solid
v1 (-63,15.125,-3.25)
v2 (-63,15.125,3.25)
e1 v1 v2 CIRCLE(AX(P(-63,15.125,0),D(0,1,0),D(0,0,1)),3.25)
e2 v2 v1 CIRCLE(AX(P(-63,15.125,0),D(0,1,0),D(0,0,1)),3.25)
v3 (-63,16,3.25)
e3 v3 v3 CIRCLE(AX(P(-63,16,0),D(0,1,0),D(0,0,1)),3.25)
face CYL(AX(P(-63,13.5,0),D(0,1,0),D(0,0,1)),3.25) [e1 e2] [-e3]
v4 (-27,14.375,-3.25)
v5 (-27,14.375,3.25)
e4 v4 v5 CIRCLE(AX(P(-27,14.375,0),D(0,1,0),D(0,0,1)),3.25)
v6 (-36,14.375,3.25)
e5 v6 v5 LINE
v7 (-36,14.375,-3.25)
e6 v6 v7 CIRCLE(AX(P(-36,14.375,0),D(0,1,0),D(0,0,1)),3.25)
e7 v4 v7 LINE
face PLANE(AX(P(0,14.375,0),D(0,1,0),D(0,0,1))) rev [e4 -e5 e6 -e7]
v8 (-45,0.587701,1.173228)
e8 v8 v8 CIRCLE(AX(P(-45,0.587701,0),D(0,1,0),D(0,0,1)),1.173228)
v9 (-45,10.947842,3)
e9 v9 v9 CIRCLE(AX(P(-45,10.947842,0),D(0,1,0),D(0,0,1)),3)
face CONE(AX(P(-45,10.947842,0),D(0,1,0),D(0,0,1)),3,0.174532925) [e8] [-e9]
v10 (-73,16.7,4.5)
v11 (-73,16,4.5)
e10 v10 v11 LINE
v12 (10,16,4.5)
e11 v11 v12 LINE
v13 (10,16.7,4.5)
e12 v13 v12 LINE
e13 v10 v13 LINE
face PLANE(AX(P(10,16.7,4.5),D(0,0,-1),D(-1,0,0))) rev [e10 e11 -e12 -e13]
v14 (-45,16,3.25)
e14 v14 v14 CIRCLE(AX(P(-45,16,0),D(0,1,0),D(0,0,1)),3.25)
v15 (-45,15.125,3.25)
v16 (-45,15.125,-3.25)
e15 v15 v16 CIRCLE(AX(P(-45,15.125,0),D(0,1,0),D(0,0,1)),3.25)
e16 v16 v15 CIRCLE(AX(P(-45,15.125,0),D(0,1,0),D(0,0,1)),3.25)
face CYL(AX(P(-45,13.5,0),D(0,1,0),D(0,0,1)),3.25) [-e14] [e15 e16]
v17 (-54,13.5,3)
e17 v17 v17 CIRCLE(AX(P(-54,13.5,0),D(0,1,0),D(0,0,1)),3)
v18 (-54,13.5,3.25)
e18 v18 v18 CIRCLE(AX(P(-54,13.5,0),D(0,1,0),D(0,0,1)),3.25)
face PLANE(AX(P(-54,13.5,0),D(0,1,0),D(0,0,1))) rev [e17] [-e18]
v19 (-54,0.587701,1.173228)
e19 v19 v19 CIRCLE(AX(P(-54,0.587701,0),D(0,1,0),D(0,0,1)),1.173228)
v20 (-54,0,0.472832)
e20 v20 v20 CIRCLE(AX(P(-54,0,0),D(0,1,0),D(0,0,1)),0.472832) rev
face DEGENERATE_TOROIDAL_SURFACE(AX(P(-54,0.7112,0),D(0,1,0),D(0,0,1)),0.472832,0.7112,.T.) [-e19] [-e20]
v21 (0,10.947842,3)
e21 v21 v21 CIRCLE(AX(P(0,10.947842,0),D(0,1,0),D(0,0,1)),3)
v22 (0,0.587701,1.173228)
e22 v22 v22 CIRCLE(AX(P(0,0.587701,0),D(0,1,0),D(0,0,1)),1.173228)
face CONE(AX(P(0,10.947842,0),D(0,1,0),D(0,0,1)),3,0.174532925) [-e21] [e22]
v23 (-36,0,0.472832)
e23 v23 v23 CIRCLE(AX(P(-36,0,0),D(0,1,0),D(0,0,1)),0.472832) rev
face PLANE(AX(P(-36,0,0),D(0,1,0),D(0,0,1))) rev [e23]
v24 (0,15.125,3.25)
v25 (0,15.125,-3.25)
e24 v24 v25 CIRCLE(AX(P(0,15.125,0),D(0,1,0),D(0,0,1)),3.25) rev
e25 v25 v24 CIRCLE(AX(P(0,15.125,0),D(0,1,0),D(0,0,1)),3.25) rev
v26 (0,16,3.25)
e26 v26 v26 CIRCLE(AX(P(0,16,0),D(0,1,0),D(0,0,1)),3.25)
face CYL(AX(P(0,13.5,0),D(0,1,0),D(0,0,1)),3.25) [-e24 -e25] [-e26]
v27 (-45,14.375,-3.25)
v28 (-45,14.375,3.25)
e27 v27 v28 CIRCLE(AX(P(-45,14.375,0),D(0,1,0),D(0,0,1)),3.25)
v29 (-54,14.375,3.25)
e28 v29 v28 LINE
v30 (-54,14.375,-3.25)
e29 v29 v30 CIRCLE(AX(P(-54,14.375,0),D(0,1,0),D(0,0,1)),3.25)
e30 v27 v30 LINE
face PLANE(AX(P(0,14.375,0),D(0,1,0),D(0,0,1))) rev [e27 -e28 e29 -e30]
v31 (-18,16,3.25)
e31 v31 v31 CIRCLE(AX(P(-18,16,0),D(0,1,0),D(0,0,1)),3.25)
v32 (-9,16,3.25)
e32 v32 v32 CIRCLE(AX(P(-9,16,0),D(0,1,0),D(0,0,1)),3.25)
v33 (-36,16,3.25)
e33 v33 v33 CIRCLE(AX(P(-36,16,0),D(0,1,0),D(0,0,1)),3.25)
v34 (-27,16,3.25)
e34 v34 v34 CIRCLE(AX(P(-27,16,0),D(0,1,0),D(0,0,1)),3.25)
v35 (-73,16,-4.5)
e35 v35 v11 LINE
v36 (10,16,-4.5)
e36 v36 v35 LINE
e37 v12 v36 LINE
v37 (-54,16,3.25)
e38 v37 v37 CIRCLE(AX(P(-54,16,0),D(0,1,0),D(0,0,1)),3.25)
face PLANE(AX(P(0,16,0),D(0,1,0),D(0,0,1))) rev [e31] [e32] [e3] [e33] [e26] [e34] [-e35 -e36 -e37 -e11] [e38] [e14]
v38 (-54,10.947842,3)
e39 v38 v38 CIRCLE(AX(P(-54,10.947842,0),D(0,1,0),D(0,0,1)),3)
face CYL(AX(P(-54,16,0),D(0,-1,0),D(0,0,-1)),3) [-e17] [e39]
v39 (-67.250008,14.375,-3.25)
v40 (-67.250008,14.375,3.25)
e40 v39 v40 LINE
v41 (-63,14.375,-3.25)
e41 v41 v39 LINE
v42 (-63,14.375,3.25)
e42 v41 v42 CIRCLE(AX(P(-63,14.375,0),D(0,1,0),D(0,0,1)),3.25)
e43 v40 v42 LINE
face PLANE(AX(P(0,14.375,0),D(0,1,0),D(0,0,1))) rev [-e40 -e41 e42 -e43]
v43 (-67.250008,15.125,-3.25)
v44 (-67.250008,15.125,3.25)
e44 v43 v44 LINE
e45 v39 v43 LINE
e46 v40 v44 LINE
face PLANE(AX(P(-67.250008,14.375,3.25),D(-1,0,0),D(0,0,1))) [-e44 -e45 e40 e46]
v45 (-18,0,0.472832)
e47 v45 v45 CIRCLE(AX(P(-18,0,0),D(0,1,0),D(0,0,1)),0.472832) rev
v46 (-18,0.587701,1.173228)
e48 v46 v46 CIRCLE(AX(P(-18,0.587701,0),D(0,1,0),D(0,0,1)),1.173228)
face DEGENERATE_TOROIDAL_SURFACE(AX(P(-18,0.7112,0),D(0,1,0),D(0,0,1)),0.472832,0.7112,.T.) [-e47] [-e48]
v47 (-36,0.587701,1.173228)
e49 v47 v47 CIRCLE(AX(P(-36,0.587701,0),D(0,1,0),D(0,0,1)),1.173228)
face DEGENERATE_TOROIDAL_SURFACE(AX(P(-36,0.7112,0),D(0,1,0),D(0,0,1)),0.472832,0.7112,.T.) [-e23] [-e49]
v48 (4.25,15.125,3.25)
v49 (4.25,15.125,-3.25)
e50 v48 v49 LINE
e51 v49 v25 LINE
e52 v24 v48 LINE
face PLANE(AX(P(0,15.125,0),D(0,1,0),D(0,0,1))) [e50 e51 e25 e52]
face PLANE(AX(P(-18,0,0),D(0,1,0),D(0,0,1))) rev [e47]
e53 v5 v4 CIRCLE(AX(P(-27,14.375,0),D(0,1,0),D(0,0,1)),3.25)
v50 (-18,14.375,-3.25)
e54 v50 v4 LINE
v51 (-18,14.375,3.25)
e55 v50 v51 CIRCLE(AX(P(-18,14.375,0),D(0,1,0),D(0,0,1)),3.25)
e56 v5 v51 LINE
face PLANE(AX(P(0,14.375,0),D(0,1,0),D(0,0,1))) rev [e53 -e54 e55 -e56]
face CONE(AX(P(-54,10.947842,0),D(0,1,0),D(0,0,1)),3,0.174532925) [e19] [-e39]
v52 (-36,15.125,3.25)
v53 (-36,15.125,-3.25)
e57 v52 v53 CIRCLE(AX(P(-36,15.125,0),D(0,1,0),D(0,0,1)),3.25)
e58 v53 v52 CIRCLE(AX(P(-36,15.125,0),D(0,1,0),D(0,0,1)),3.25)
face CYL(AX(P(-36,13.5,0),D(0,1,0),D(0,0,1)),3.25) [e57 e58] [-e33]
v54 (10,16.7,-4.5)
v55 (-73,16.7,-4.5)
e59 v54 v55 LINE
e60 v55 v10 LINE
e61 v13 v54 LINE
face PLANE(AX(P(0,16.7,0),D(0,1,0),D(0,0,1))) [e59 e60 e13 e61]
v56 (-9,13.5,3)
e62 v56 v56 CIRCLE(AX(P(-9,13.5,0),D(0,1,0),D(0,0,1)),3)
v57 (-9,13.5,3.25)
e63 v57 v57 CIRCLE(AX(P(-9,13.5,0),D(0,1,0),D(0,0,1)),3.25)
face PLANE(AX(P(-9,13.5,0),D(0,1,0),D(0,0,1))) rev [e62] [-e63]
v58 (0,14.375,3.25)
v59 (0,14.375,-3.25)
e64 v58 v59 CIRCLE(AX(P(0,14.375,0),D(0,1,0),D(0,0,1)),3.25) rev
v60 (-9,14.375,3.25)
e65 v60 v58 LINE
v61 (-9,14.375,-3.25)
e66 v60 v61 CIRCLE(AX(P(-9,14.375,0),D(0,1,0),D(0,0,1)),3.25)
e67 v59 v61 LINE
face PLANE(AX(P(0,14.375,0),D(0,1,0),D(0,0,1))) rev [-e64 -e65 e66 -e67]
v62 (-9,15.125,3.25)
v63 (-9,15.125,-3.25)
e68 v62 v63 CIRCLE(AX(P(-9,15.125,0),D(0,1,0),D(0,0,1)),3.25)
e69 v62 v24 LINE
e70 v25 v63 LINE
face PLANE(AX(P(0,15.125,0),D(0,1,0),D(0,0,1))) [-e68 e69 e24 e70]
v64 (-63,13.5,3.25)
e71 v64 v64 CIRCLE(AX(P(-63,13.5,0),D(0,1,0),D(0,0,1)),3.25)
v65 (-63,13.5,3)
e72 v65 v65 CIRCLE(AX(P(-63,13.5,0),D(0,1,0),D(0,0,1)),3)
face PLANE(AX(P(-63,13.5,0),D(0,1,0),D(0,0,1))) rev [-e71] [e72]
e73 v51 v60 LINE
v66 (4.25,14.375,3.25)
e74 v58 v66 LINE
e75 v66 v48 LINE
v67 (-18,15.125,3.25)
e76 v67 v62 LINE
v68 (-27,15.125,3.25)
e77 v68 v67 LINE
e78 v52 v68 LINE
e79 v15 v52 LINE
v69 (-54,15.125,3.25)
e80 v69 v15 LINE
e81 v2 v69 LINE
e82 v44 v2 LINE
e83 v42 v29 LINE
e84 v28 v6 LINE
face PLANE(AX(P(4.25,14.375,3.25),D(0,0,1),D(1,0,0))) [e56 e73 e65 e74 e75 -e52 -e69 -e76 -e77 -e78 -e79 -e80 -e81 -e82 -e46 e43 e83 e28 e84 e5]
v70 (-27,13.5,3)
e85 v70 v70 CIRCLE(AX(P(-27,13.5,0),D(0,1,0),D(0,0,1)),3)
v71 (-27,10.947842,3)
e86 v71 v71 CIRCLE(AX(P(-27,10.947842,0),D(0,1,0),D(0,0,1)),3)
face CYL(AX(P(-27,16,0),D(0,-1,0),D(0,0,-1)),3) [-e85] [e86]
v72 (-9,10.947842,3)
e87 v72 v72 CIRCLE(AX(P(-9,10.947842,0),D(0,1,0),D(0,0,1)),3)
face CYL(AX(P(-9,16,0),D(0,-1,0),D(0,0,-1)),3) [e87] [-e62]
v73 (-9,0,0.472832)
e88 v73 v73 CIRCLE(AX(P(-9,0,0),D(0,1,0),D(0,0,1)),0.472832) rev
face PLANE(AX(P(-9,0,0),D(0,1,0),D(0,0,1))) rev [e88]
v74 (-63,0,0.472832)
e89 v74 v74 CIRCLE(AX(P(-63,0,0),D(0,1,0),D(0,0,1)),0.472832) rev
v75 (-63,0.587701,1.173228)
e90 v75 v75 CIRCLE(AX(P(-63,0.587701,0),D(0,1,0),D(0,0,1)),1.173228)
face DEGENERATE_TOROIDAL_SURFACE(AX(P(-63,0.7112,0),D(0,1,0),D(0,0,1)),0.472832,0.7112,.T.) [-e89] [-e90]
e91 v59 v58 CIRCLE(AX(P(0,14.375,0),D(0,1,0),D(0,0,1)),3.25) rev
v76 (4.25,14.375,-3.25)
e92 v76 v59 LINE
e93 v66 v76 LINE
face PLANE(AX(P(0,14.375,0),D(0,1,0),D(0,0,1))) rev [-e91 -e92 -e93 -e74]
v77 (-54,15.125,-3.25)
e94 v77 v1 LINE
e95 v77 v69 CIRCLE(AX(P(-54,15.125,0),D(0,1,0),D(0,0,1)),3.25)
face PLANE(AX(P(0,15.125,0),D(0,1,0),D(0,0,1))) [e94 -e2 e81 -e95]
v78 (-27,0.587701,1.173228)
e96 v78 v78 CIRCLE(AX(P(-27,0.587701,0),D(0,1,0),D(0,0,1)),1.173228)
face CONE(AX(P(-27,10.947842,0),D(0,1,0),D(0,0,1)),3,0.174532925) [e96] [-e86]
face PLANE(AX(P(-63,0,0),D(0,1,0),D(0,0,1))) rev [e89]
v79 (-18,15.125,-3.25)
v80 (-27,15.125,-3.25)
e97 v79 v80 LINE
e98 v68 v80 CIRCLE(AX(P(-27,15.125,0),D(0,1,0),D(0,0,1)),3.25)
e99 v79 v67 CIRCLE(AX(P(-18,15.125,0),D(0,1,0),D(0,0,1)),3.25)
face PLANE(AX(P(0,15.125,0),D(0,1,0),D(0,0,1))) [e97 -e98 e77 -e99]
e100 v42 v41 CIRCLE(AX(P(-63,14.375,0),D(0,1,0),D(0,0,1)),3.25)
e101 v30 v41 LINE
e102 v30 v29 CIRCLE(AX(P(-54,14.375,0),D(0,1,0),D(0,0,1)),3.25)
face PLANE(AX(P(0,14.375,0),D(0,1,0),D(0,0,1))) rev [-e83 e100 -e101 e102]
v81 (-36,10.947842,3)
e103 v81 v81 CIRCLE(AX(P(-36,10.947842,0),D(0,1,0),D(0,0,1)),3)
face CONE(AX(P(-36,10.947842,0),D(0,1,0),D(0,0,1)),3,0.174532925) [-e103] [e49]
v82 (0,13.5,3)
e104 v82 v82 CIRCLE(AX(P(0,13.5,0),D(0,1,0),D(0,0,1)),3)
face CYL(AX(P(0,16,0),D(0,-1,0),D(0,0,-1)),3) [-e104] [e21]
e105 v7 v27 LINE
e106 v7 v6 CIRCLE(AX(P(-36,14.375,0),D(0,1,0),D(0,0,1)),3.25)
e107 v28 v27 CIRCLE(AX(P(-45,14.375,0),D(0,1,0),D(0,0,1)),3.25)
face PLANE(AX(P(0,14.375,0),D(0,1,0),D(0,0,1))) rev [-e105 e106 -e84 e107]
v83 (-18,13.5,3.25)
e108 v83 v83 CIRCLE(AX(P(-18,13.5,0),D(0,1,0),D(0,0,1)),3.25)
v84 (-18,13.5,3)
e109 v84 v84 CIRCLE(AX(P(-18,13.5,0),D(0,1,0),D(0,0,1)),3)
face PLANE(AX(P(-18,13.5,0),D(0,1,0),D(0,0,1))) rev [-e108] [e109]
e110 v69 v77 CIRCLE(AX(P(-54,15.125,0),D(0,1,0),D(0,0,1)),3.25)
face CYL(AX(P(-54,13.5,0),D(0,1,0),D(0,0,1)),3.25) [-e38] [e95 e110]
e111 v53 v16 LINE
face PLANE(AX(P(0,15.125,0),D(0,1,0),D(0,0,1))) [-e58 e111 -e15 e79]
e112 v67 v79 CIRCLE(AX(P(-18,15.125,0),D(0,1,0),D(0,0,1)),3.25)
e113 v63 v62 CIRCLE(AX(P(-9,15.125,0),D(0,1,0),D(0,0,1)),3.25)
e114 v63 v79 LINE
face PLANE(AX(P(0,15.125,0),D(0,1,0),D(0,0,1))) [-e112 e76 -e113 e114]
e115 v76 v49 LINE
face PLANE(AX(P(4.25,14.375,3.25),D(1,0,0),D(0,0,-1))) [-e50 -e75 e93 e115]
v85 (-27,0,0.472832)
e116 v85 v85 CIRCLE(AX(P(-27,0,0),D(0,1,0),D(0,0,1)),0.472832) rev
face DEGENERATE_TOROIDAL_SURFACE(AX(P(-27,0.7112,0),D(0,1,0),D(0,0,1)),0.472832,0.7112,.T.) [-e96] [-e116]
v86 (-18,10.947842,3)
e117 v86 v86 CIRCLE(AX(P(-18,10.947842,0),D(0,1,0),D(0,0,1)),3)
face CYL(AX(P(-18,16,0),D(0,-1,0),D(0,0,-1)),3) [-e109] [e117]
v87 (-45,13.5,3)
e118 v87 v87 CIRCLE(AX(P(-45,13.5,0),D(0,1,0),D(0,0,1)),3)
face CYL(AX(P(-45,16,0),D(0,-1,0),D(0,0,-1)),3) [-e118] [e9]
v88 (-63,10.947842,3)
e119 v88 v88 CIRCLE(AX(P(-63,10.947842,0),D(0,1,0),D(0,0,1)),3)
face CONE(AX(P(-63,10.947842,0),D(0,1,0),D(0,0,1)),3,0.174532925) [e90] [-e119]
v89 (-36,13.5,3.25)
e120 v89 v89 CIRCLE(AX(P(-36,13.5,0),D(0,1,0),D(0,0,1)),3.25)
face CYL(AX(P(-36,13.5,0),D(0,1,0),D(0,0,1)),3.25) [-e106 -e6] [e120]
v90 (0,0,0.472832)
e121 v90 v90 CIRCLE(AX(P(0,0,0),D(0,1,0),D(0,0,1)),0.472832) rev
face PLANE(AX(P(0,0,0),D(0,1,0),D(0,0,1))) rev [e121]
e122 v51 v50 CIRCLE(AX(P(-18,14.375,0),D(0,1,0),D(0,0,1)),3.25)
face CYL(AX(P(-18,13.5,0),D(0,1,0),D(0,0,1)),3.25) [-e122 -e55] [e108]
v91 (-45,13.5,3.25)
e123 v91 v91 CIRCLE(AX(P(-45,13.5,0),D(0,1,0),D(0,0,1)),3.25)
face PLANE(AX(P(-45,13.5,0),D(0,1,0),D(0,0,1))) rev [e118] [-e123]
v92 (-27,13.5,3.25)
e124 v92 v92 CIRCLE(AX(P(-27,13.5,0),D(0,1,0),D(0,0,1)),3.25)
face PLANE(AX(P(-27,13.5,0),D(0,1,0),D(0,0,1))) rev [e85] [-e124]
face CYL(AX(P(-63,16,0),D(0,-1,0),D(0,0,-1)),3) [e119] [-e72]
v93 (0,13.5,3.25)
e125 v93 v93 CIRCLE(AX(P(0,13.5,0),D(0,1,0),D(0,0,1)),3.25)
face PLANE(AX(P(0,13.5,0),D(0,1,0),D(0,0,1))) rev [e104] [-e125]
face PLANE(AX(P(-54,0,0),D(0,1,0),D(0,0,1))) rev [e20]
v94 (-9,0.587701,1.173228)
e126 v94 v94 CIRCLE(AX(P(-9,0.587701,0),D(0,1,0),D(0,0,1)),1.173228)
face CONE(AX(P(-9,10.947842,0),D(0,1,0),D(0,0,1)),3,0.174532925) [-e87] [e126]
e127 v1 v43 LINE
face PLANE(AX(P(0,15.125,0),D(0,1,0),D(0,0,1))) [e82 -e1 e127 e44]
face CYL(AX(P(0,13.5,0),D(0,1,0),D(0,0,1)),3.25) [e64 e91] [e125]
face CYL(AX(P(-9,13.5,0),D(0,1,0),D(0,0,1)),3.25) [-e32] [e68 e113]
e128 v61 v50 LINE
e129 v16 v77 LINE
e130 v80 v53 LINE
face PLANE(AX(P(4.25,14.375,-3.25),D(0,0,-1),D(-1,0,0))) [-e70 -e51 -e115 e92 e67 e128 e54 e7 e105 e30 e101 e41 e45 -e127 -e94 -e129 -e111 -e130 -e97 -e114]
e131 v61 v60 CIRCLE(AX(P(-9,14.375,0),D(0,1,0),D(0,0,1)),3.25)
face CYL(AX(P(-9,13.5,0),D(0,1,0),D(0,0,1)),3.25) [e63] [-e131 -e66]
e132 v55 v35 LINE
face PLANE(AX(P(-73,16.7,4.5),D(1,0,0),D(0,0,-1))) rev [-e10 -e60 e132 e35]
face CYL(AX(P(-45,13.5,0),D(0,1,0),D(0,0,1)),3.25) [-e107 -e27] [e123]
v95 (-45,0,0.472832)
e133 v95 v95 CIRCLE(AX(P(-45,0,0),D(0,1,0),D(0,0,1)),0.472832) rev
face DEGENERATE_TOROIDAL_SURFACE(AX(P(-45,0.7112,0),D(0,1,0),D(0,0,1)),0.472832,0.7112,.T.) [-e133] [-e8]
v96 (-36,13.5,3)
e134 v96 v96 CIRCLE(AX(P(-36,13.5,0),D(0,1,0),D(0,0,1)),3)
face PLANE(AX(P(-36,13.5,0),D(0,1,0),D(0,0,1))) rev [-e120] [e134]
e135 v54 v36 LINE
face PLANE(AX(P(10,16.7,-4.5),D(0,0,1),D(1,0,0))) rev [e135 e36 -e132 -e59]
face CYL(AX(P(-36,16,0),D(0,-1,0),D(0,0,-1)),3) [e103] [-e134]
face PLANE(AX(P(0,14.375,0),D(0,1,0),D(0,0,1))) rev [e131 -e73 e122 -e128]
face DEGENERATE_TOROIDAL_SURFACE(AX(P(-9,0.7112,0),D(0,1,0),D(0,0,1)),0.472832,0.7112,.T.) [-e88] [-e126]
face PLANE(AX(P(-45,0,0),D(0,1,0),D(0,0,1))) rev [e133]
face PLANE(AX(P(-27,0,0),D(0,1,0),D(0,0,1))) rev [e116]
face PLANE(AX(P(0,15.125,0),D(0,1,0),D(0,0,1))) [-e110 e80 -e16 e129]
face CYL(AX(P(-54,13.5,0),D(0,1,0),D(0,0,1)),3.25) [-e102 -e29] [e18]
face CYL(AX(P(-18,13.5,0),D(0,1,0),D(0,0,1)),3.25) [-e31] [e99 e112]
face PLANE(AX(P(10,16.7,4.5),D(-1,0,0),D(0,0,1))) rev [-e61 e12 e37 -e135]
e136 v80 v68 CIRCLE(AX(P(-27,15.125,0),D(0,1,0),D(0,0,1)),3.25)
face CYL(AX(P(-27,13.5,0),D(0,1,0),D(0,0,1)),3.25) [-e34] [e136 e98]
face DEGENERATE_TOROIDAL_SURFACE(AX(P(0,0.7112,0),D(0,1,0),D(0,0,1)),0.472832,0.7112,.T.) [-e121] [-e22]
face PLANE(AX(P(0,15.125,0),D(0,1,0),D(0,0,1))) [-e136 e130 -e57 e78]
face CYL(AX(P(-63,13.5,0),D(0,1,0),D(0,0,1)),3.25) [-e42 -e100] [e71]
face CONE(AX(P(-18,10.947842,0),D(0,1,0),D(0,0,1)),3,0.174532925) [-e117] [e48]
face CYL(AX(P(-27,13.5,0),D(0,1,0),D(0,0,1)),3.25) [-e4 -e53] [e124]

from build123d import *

# Parameters (mm, degrees)
SKETCH2_R           = 3
BOSS_EXTRUDE1_DEPTH = 16
CHAMFER1_SIZE       = 1.9304
CHAMFER1_SIZE2      = 10.947842425
FILLET2_R           = 0.7112
SKETCH3_R           = 3.25
BOSS_EXTRUDE2_DEPTH = 2.5
SKETCH4_W           = 71.5000084
SKETCH4_H           = 6.5
BOSS_EXTRUDE3_DEPTH = 0.75
LPATTERN1_START     = 15.124999972
LPATTERN1_OUTLINE_R = 3.25
LPATTERN1_DEPTH     = 0.875000028
SKETCH5_W           = 83
SKETCH5_H           = 9
BOSS_EXTRUDE4_DEPTH = 0.7


# Read off the part's stored shape, not the designer's step: LPattern1
with BuildPart() as part:
    # Sketch2 → Boss-Extrude1 (new body)
    with BuildSketch(Plane(origin=(0, 0, 0), x_dir=(1, 0, 0), z_dir=(0, 1, 0))):
        with Locations(Location((0, 0, 0), (0, 0, 270))):
            Circle(SKETCH2_R)
    extrude(amount=BOSS_EXTRUDE1_DEPTH)

    # Chamfer1
    chamfer1_edges = [part.edges().sort_by_distance(p)[0] for p in [
        (0, 0, -3),
    ]]
    chamfer1_side = [part.faces().sort_by_distance(p)[0] for p in [
        (0, 0, 0),
    ]]
    chamfer(chamfer1_edges, length=CHAMFER1_SIZE, length2=CHAMFER1_SIZE2, reference=chamfer1_side[0])

    # Fillet2
    fillet2_edges = [part.edges().sort_by_distance(p)[0] for p in [
        (0, 0, -1.0696),
    ]]
    fillet(fillet2_edges, radius=FILLET2_R)

    # Sketch3 → Boss-Extrude2 (add)
    with BuildSketch(Plane(origin=(0, 16, 0), x_dir=(1, 0, 0), z_dir=(0, 1, 0))):
        with Locations(Location((0, 0, 0), (0, 0, 270))):
            Circle(SKETCH3_R)
    extrude(amount=-BOSS_EXTRUDE2_DEPTH)

    # Sketch4 → Boss-Extrude3 (add)
    with BuildSketch(Plane(origin=(0, 15.124999972, 0), x_dir=(1, 0, 0), z_dir=(0, 1, 0))):
        with Locations((-31.5000042, 0)):
            Rectangle(SKETCH4_W, SKETCH4_H)
    extrude(amount=-BOSS_EXTRUDE3_DEPTH)

    # LPattern1 outline → LPattern1 (add)
    with BuildSketch(Plane(origin=(0, 0, 0), x_dir=(1, 0, 0), z_dir=(0, 1, 0)).offset(LPATTERN1_START)):
        with Locations((-9, 0)):
            Circle(LPATTERN1_OUTLINE_R)
        with Locations((-18, 0)):
            Circle(LPATTERN1_OUTLINE_R)
        with Locations((-27, 0)):
            Circle(LPATTERN1_OUTLINE_R)
        with Locations((-36, 0)):
            Circle(LPATTERN1_OUTLINE_R)
        with Locations((-45, 0)):
            Circle(LPATTERN1_OUTLINE_R)
        with Locations((-54, 0)):
            Circle(LPATTERN1_OUTLINE_R)
        with Locations((-63, 0)):
            Circle(LPATTERN1_OUTLINE_R)
    extrude(amount=LPATTERN1_DEPTH)

    # LPattern1 2 outline → LPattern1 2 (revolve)
    with BuildSketch(Plane(origin=(-9, 0, 0), x_dir=(1, 0, 0), z_dir=(0, 0, 1))):
        with BuildLine():
            Line((0, 14.374999972), (0, 0))
            Line((0, 0), (0.472832342, 0))
            ThreePointArc((0.472832342, 0), (0.92998289, 0.166389192), (1.173227616, 0.587701416))
            Line((1.173227616, 0.587701416), (3, 10.947842425))
            Line((3, 10.947842425), (3, 13.5))
            Line((3, 13.5), (3.25, 13.5))
            Line((3.25, 13.5), (3.25, 14.374999972))
            Line((3.25, 14.374999972), (0, 14.374999972))
        make_face()
    revolve(axis=Axis((-9, 0, 0), (0, 1, 0)))

    # LPattern1 3 outline → LPattern1 3 (revolve)
    with BuildSketch(Plane(origin=(-18, 0, 0), x_dir=(1, 0, 0), z_dir=(0, 0, 1))):
        with BuildLine():
            Line((0, 14.374999972), (0, 0))
            Line((0, 0), (0.472832342, 0))
            ThreePointArc((0.472832342, 0), (0.92998289, 0.166389192), (1.173227616, 0.587701416))
            Line((1.173227616, 0.587701416), (3, 10.947842425))
            Line((3, 10.947842425), (3, 13.5))
            Line((3, 13.5), (3.25, 13.5))
            Line((3.25, 13.5), (3.25, 14.374999972))
            Line((3.25, 14.374999972), (0, 14.374999972))
        make_face()
    revolve(axis=Axis((-18, 0, 0), (0, 1, 0)))

    # LPattern1 4 outline → LPattern1 4 (revolve)
    with BuildSketch(Plane(origin=(-27, 0, 0), x_dir=(1, 0, 0), z_dir=(0, 0, 1))):
        with BuildLine():
            Line((0, 14.374999972), (0, 0))
            Line((0, 0), (0.472832342, 0))
            ThreePointArc((0.472832342, 0), (0.92998289, 0.166389192), (1.173227616, 0.587701416))
            Line((1.173227616, 0.587701416), (3, 10.947842425))
            Line((3, 10.947842425), (3, 13.5))
            Line((3, 13.5), (3.25, 13.5))
            Line((3.25, 13.5), (3.25, 14.374999972))
            Line((3.25, 14.374999972), (0, 14.374999972))
        make_face()
    revolve(axis=Axis((-27, 0, 0), (0, 1, 0)))

    # LPattern1 5 outline → LPattern1 5 (revolve)
    with BuildSketch(Plane(origin=(-36, 0, 0), x_dir=(1, 0, 0), z_dir=(0, 0, 1))):
        with BuildLine():
            Line((0, 14.374999972), (0, 0))
            Line((0, 0), (0.472832342, 0))
            ThreePointArc((0.472832342, 0), (0.92998289, 0.166389192), (1.173227616, 0.587701416))
            Line((1.173227616, 0.587701416), (3, 10.947842425))
            Line((3, 10.947842425), (3, 13.5))
            Line((3, 13.5), (3.25, 13.5))
            Line((3.25, 13.5), (3.25, 14.374999972))
            Line((3.25, 14.374999972), (0, 14.374999972))
        make_face()
    revolve(axis=Axis((-36, 0, 0), (0, 1, 0)))

    # LPattern1 6 outline → LPattern1 6 (revolve)
    with BuildSketch(Plane(origin=(-45, 0, 0), x_dir=(1, 0, 0), z_dir=(0, 0, 1))):
        with BuildLine():
            Line((0, 14.374999972), (0, 0))
            Line((0, 0), (0.472832342, 0))
            ThreePointArc((0.472832342, 0), (0.92998289, 0.166389192), (1.173227616, 0.587701416))
            Line((1.173227616, 0.587701416), (3, 10.947842425))
            Line((3, 10.947842425), (3, 13.5))
            Line((3, 13.5), (3.25, 13.5))
            Line((3.25, 13.5), (3.25, 14.374999972))
            Line((3.25, 14.374999972), (0, 14.374999972))
        make_face()
    revolve(axis=Axis((-45, 0, 0), (0, 1, 0)))

    # LPattern1 7 outline → LPattern1 7 (revolve)
    with BuildSketch(Plane(origin=(-54, 0, 0), x_dir=(1, 0, 0), z_dir=(0, 0, 1))):
        with BuildLine():
            Line((0, 14.374999972), (0, 0))
            Line((0, 0), (0.472832342, 0))
            ThreePointArc((0.472832342, 0), (0.92998289, 0.166389192), (1.173227616, 0.587701416))
            Line((1.173227616, 0.587701416), (3, 10.947842425))
            Line((3, 10.947842425), (3, 13.5))
            Line((3, 13.5), (3.25, 13.5))
            Line((3.25, 13.5), (3.25, 14.374999972))
            Line((3.25, 14.374999972), (0, 14.374999972))
        make_face()
    revolve(axis=Axis((-54, 0, 0), (0, 1, 0)))

    # LPattern1 8 outline → LPattern1 8 (revolve)
    with BuildSketch(Plane(origin=(-63, 0, 0), x_dir=(1, 0, 0), z_dir=(0, 0, 1))):
        with BuildLine():
            Line((0, 14.374999972), (0, 0))
            Line((0, 0), (0.472832342, 0))
            ThreePointArc((0.472832342, 0), (0.92998289, 0.166389192), (1.173227616, 0.587701416))
            Line((1.173227616, 0.587701416), (3, 10.947842425))
            Line((3, 10.947842425), (3, 13.5))
            Line((3, 13.5), (3.25, 13.5))
            Line((3.25, 13.5), (3.25, 14.374999972))
            Line((3.25, 14.374999972), (0, 14.374999972))
        make_face()
    revolve(axis=Axis((-63, 0, 0), (0, 1, 0)))

    # Sketch5 → Boss-Extrude4 (add)
    with BuildSketch(Plane(origin=(0, 16, 0), x_dir=(1, 0, 0), z_dir=(0, 1, 0))):
        with Locations((-31.5, 0)):
            Rectangle(SKETCH5_W, SKETCH5_H)
    extrude(amount=BOSS_EXTRUDE4_DEPTH)


solid = part.part
